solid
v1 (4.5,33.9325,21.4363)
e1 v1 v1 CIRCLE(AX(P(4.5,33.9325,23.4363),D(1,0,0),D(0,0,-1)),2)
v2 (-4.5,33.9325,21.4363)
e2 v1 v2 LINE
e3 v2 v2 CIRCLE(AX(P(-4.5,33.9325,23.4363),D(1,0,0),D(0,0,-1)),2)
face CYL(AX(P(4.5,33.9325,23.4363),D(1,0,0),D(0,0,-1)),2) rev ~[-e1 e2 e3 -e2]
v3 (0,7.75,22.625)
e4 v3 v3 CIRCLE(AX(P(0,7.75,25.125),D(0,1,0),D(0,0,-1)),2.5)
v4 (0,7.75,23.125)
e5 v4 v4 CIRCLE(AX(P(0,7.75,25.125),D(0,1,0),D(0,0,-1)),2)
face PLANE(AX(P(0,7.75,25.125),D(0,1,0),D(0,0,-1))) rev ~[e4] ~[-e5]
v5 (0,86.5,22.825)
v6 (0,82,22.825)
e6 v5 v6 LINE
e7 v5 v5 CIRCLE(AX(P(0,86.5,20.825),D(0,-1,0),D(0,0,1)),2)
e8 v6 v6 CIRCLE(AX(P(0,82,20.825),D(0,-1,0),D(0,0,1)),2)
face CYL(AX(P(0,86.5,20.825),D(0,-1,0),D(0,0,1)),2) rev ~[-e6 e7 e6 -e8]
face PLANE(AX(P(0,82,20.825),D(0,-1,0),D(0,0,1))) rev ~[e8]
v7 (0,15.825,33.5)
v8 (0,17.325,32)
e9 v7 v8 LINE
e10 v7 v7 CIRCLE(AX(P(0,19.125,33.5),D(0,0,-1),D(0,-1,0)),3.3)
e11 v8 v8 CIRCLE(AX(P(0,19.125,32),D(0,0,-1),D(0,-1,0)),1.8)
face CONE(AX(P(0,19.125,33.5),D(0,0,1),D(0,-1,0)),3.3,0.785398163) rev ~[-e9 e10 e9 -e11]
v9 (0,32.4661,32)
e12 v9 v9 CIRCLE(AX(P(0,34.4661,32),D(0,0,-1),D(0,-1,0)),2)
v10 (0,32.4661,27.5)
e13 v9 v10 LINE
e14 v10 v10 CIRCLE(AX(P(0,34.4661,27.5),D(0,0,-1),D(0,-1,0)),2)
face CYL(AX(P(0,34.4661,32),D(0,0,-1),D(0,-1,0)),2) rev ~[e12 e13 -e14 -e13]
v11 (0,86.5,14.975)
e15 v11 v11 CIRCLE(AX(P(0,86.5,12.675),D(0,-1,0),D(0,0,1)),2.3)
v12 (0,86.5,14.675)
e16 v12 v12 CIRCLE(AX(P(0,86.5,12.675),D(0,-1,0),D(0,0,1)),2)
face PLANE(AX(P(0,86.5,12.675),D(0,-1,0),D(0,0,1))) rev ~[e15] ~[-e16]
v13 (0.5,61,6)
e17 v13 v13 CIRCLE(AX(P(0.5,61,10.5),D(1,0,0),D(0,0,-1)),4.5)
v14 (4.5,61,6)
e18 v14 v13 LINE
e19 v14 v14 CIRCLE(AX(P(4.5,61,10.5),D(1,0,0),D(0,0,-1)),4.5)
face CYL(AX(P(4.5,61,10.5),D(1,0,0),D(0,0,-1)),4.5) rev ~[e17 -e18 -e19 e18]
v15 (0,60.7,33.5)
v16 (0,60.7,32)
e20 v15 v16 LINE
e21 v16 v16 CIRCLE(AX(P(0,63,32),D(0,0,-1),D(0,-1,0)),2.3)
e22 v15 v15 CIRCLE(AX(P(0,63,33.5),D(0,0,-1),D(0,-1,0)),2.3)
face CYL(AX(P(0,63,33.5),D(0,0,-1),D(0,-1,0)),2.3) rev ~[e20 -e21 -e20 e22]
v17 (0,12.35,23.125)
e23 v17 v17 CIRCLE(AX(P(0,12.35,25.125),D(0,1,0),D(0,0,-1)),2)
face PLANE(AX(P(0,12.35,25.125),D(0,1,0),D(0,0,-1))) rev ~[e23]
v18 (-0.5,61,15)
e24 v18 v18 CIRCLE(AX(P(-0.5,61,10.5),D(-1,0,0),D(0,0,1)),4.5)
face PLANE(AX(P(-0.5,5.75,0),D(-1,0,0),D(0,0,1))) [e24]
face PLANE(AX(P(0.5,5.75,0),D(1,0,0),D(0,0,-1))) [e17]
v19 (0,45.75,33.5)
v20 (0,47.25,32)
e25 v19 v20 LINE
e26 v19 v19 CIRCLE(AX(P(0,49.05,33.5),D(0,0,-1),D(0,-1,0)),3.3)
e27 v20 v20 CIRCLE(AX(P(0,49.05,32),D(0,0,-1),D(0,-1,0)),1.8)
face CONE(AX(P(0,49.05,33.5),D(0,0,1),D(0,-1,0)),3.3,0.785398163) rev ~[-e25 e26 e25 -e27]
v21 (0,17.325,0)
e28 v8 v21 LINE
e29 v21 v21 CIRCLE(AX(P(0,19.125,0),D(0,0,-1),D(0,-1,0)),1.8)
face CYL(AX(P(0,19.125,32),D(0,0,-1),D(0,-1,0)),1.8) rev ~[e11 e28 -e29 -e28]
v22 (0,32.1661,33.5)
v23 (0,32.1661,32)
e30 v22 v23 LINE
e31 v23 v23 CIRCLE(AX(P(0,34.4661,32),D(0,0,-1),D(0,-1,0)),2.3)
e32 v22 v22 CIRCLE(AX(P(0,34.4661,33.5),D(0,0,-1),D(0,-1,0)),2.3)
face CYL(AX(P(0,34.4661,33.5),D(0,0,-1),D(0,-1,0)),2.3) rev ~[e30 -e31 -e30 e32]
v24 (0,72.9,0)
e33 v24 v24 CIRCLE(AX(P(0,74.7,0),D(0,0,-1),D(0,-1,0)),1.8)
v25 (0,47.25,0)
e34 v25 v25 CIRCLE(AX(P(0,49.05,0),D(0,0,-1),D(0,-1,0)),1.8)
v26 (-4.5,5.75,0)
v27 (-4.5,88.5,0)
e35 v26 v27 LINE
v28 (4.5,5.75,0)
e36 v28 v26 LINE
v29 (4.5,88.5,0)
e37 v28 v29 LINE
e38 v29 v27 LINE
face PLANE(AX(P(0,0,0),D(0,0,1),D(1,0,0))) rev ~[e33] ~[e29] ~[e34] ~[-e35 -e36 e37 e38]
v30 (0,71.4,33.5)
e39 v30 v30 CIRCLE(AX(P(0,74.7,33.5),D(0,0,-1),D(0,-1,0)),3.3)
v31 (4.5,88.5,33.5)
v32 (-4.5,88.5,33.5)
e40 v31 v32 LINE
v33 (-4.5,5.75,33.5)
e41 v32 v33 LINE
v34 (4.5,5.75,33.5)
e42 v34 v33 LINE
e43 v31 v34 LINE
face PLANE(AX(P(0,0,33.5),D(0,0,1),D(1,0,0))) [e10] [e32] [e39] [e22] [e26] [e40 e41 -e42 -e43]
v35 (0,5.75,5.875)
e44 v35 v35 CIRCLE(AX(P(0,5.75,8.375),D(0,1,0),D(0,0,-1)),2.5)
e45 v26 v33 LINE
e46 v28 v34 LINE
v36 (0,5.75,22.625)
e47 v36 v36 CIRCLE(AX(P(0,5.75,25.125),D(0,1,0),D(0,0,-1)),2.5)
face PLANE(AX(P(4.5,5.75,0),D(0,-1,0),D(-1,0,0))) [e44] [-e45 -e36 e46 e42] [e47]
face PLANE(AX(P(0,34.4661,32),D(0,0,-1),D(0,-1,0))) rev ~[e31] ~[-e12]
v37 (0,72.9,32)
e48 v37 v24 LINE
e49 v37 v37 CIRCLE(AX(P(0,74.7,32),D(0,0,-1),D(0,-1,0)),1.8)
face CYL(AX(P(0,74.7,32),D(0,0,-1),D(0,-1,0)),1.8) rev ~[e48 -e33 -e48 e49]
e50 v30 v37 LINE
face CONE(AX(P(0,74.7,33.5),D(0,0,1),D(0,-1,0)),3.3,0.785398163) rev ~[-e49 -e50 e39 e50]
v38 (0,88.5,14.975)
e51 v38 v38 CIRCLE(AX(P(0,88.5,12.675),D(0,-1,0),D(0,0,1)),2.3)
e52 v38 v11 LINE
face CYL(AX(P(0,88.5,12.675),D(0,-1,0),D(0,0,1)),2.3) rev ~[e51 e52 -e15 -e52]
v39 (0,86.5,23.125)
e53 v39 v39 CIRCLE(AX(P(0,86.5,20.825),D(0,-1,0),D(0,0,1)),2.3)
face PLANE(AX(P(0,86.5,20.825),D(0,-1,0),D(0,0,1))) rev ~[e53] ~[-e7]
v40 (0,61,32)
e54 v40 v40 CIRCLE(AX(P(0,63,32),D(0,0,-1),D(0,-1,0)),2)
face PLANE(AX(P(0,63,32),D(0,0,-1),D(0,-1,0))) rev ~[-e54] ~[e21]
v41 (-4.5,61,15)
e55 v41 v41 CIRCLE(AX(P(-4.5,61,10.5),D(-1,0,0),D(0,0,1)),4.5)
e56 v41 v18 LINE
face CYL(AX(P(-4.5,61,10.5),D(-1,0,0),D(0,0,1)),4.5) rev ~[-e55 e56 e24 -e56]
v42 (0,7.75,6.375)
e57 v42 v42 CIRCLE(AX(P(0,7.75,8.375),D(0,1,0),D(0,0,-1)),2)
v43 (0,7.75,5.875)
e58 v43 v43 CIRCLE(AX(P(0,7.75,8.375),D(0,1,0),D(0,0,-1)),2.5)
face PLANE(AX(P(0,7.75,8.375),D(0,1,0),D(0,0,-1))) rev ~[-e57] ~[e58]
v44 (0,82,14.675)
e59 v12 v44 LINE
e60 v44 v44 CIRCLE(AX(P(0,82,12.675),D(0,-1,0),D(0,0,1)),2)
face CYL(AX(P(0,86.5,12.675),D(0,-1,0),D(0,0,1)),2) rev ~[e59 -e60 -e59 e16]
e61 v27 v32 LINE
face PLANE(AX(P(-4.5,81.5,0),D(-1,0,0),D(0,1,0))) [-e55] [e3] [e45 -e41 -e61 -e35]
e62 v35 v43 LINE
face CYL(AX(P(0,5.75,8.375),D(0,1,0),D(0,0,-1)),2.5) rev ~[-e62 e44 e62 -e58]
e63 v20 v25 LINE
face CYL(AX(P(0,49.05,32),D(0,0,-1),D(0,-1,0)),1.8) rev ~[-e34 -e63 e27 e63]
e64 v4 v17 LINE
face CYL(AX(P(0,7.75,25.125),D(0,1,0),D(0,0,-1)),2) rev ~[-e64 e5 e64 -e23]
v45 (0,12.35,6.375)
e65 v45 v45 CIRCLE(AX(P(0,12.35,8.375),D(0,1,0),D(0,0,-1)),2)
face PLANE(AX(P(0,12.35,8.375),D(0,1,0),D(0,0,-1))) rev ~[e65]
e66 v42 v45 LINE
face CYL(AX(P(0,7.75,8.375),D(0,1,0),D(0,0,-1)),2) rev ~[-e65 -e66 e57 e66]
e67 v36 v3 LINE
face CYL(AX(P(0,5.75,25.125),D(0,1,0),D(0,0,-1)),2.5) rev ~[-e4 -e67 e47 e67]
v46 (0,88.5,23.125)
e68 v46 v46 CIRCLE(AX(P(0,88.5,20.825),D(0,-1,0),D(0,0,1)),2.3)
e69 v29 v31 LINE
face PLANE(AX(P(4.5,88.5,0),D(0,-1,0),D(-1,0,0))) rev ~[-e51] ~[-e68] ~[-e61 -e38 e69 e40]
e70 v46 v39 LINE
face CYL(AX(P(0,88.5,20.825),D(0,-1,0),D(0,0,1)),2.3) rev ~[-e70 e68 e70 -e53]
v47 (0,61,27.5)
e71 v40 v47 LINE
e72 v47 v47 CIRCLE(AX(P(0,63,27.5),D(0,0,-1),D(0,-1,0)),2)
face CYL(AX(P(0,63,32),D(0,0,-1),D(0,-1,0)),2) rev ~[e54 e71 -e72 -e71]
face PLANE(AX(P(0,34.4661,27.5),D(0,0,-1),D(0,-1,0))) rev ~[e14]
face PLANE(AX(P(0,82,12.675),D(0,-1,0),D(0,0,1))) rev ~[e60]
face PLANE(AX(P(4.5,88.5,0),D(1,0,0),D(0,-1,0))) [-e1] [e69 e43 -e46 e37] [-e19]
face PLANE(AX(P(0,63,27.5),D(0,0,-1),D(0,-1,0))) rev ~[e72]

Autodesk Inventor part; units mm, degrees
ref_plane "YZ Plane" through (0, 0, 0) normal (1, 0, 0) x (0, 1, 0)
ref_plane "XZ Plane" through (0, 0, 0) normal (0, 1, 0) x (-1, 0, 0)
ref_plane "Work Plane1" through (0, 0, 0) normal (0, 0, 1) x (1, 0, 0)
ref_plane "Work Plane2" through (-89, -40.3889, 33.5) normal (0, 0, 1) x (1, 0, 0)
sketch "Sketch1" plane through (0, 0, 0) normal (0, 0, 1) x (1, 0, 0)
  line L0 (23.5, 88.5) -> (-23.5, 88.5) projected
  line L1 (-23.5, 88.5) -> (-23.5, 36.5) projected
  line L2 (-26.5, 33.5) -> (-89, 33.5) projected
  line L3 (-89, 33.5) -> (-89, -72.5) projected
  line L4 (-89, -72.5) -> (-77, -72.5) projected
  line L5 (-74, -75.5) -> (-74, -93.5) projected
  line L6 (-74, -93.5) -> (74, -93.5) projected
  line L7 (74, -93.5) -> (74, -75.5) projected
  line L8 (77, -72.5) -> (89, -72.5) projected
  line L9 (89, -72.5) -> (89, 33.5) projected
  line L10 (89, 33.5) -> (26.5, 33.5) projected
  line L11 (23.5, 36.5) -> (23.5, 88.5) projected
  line L12 (-4.5, 81.5) -> (-4.5, 36.5) projected
  line L13 (-7.5, 33.5) -> (-13.5, 33.5) projected
  line L14 (-16.5, 36.5) -> (-16.5, 81.5) projected
  line L15 (7.5, 84.5) -> (13.5, 84.5) projected
  line L16 (16.5, 81.5) -> (16.5, 36.5) projected
  line L17 (13.5, 33.5) -> (7.5, 33.5) projected
  line L18 (4.5, 36.5) -> (4.5, 81.5) projected
  line L19 (-13.5, 84.5) -> (-7.5, 84.5) projected
  line L20 (-4.5, 88.5) -> (4.5, 88.5)
  line L21 (4.5, 88.5) -> (4.5, 5.75)
  line L22 (4.5, 5.75) -> (-4.5, 5.75)
  line L23 (-4.5, 5.75) -> (-4.5, 88.5)
  line L24 (-32.2, 4.75) -> (-59.9, 4.75)
  arc A0 (13.5, 33.5) -> (16.5, 36.5) centre (13.5, 36.5) ccw projected
  arc A1 (4.5, 36.5) -> (7.5, 33.5) centre (7.5, 36.5) ccw projected
  arc A2 (7.5, 84.5) -> (4.5, 81.5) centre (7.5, 81.5) ccw projected
  arc A3 (16.5, 81.5) -> (13.5, 84.5) centre (13.5, 81.5) ccw projected
  arc A4 (-4.5, 81.5) -> (-7.5, 84.5) centre (-7.5, 81.5) ccw projected
  arc A5 (-7.5, 33.5) -> (-4.5, 36.5) centre (-7.5, 36.5) ccw projected
  arc A6 (-16.5, 36.5) -> (-13.5, 33.5) centre (-13.5, 36.5) ccw projected
  arc A7 (-13.5, 84.5) -> (-16.5, 81.5) centre (-13.5, 81.5) ccw projected
  arc A8 (-26.5, 33.5) -> (-23.5, 36.5) centre (-26.5, 36.5) ccw projected
  arc A9 (-74, -75.5) -> (-77, -72.5) centre (-77, -75.5) ccw projected
  arc A10 (77, -72.5) -> (74, -75.5) centre (77, -75.5) ccw projected
  arc A11 (23.5, 36.5) -> (26.5, 33.5) centre (26.5, 36.5) ccw projected
  circle A12 centre (39.125, 25.9125) radius 1.0065 projected
  circle A13 centre (72.95, 12.275) radius 1.0065 projected
  circle A14 centre (-39.125, 12.3375) radius 1.0065 projected
  circle A15 centre (-72.95, 25.975) radius 1.0065 projected
  circle A16 centre (-72.95, 12.275) radius 1.0065 projected
  circle A17 centre (-39.125, 25.9125) radius 1.0065 projected
  circle A18 centre (72.95, 25.975) radius 1.0065 projected
  circle A19 centre (39.125, 12.3375) radius 1.0065 projected
  circle A20 centre (-42.4984, -44.6666) radius 1.2295 projected
  circle A21 centre (-79, -42.3889) radius 1.2295 projected
  circle A22 centre (-19.5, 28.875) radius 1.2295 projected
  circle A23 centre (19.5, 9.55) radius 1.2295 projected
  circle A24 centre (19.5, 47.3) radius 1.2295 projected
  circle A25 centre (-19.5, 47.3) radius 1.2295 projected
  circle A26 centre (0, 74.7) radius 1.2295 projected
  circle A27 centre (-19.4231, 74.8077) radius 1.2295 projected
  circle A28 centre (19.5, 74.7) radius 1.2295 projected
  circle A29 centre (0, 49.05) radius 1.2295 projected
  circle A30 centre (19.5, 28.875) radius 1.2295 projected
  circle A31 centre (0, 19.125) radius 1.2295 projected
  circle A32 centre (-19.5, 9.55) radius 1.2295 projected
  circle A33 centre (42.5, -44.6649) radius 1.2295 projected
  circle A34 centre (79, -42.3889) radius 1.2295 projected
  circle A35 centre (21.5, -85.5) radius 1.8 projected
  circle A36 centre (-64.5, -85.5) radius 1.8 projected
  circle A37 centre (-21.5, -85.5) radius 1.8 projected
  circle A38 centre (64.5, -85.5) radius 1.8 projected
  line L25 (-57, -78.5) -> (-82, -60.2553) projected
  line L26 (-82, -60.2553) -> (-82, -45.3889) projected
  line L27 (-76, -45.3889) -> (-45.4984, -47.6666) projected
  line L28 (-21.1, -27.9) -> (-21.1, -21.9) projected
  line L29 (-45.4984, -41.6666) -> (-76, -39.3889) projected
  line L30 (-82, -39.3889) -> (-82, 4.75) projected
  line L31 (30.3333, 4.75) -> (82, 4.75) projected
  line L32 (82, 4.75) -> (82, -39.3889) projected
  line L33 (76, -39.3889) -> (45.5, -41.6649) projected
  line L34 (21.1, -21.9) -> (21.1, -27.9) projected
  line L35 (45.5, -47.6649) -> (76, -45.3889) projected
  line L36 (82, -45.3889) -> (82, -60.2553) projected
  line L37 (82, -60.2553) -> (57, -78.5) projected
  line L38 (57, -78.5) -> (57, -87.5) projected
  arc A39 (55, -89.5) -> (57, -87.5) centre (55, -87.5) ccw projected
  line L39 (55, -89.5) -> (31, -89.5) projected
  arc A40 (29, -87.5) -> (31, -89.5) centre (31, -87.5) ccw projected
  line L40 (29, -87.5) -> (29, -78.5) projected
  line L41 (14, -78.5) -> (14, -87.5) projected
  arc A41 (12, -89.5) -> (14, -87.5) centre (12, -87.5) ccw projected
  line L42 (12, -89.5) -> (-12, -89.5) projected
  arc A42 (-14, -87.5) -> (-12, -89.5) centre (-12, -87.5) ccw projected
  line L43 (-14, -87.5) -> (-14, -78.5) projected
  line L44 (-29, -78.5) -> (-29, -87.5) projected
  arc A43 (-31, -89.5) -> (-29, -87.5) centre (-31, -87.5) ccw projected
  line L45 (-31, -89.5) -> (-55, -89.5) projected
  arc A44 (-57, -87.5) -> (-55, -89.5) centre (-55, -87.5) ccw projected
  line L46 (-57, -87.5) -> (-57, -78.5) projected
  line L47 (-69.95, 28.9125) -> (-42.125, 28.9125) projected
  line L48 (-42.125, 28.9125) -> (-42.125, 9.275) projected
  line L49 (-42.125, 9.275) -> (-69.95, 9.275) projected
  line L50 (-69.95, 9.275) -> (-69.95, 28.9125) projected
  line L51 (-16.5, 9.75) -> (-16.5, 28.5) projected
  line L52 (-16.5, 28.5) -> (-4.5, 28.5) projected
  line L53 (-4.5, 28.5) -> (-4.5, 9.75) projected
  line L54 (-4.5, 9.75) -> (-16.5, 9.75) projected
  line L55 (69.95, 9.3375) -> (42.125, 9.3375) projected
  line L56 (42.125, 9.3375) -> (42.125, 28.975) projected
  line L57 (42.125, 28.975) -> (69.95, 28.975) projected
  line L58 (69.95, 28.975) -> (69.95, 9.3375) projected
  line L59 (4.5, 9.75) -> (4.5, 28.5) projected
  line L60 (4.5, 28.5) -> (16.5, 28.5) projected
  line L61 (16.5, 28.5) -> (16.5, 9.75) projected
  line L62 (16.5, 9.75) -> (4.5, 9.75) projected
  line L63 (45.5, -41.6649) -> (27.1, -21.9) projected
  line L64 (27.1, -21.9) -> (30.3333, 4.75) projected
  line L65 (-45.4984, -47.6666) -> (-29, -78.5) projected
  line L66 (-82, 4.75) -> (-30.3333, 4.75) projected
  line L67 (-30.3333, 4.75) -> (-27.1, -21.9) projected
  line L68 (-27.1, -21.9) -> (-45.4984, -41.6666) projected
  line L69 (29, -78.5) -> (45.5, -47.6649) projected
  line L70 (-14, -78.5) -> (-39, -45.3279) projected
  line L71 (-39, -44.2124) -> (-21.1, -27.9) projected
  line L72 (-21.1, -21.9) -> (-24.3333, 4.75) projected
  line L73 (-24.3333, 4.75) -> (24.3333, 4.75) projected
  line L74 (24.3333, 4.75) -> (21.1, -21.9) projected
  line L75 (21.1, -27.9) -> (39.5, -44.6649) projected
  line L76 (39.5, -44.6649) -> (14, -78.5) projected
  circle A45 centre (-78, -67.1725) radius 1.2295 projected
  circle A46 centre (78, -67.1725) radius 1.2295 projected
  line L77 (-22.5, 28.9125) -> (-22.5, 9.55) projected
  line L78 (-22.5, 9.55) -> (-36.125, 9.55) projected
  line L79 (-36.125, 9.55) -> (-36.125, 28.9125) projected
  line L80 (-36.125, 28.9125) -> (-22.5, 28.9125) projected
  line L81 (76, -45.3889) -> (82, -45.3889) projected
  line L82 (82, -39.3889) -> (76, -39.3889) projected
  line L83 (36.125, 9.275) -> (22.5, 9.275) projected
  line L84 (22.5, 9.275) -> (22.5, 28.9125) projected
  line L85 (22.5, 28.9125) -> (36.125, 28.9125) projected
  line L86 (36.125, 28.9125) -> (36.125, 9.275) projected
  line L87 (-86, 28.975) -> (-75.95, 28.975) projected
  line L88 (-75.95, 28.975) -> (-75.95, 9.275) projected
  line L89 (-75.95, 9.275) -> (-86, 9.275) projected
  line L90 (-86, 9.275) -> (-86, 28.975) projected
  line L91 (-82, -45.3889) -> (-76, -45.3889) projected
  line L92 (-76, -39.3889) -> (-82, -39.3889) projected
  line L93 (75.95, 28.975) -> (86, 28.975) projected
  line L94 (86, 28.975) -> (86, 9.275) projected
  line L95 (86, 9.275) -> (75.95, 9.275) projected
  line L96 (75.95, 9.275) -> (75.95, 28.975) projected
  line L97 (-39, -45.3279) -> (-39, -44.2124) projected
  circle A47 centre (-24.1, -73.1) radius 1.2295 projected
  circle A48 centre (24.1, -24.9) radius 1.2295 projected
  circle A49 centre (-24.1, -24.9) radius 1.2295 projected
  circle A50 centre (24.1, -73.1) radius 1.2295 projected
  point P0 (0, 0)
  point P1 (-4.5, 81.5)
  point P2 (-4.5, 36.5)
  point P3 (7.5, 81.5)
  point P4 (13.5, 81.5)
  point P5 (-7.5, 81.5)
  point P6 (-13.5, 81.5)
  point P7 (-77, -75.5)
  point P8 (39, -44.2094)
  point P9 (-79, -67.8878)
  point P10 (-79, -66.4572)
  point P11 (7.5, 81.5)
  point P12 (13.5, 81.5)
  point P13 (-7.5, 81.5)
  point P14 (-13.5, 81.5)
  dimension "d41" = 1
extrude "Extrusion1" add sketch "Sketch1" along normal up to surface (33.5 mm away) contours L21 L18 L22 L23 L12 L0 | A26 | A29 | A31
sketch "Sketch2" plane through (4.5, 5.75, 0) normal (1, 0, 0) x (0, 0, -1)
  circle A0 centre (-23.4363, 28.1825) radius 2 projected
  point P0 (0, -5.75)
extrude "Extrusion2" cut sketch "Sketch2" against normal blind 10
sketch "Sketch3" plane through (4.5, 5.75, 0) normal (1, 0, 0) x (0, 0, -1)
  circle A0 centre (-10.5, 55.25) radius 4.5 projected
  point P0 (0, -5.75)
extrude "Extrusion3" cut sketch "Sketch3" against normal blind 4
sketch "Sketch4" plane through (-4.5, 5.75, 0) normal (-1, 0, 0) x (0, 0, 1)
  circle A0 centre (10.5, 55.25) radius 4.5 projected
  point P0 (0, -5.75)
extrude "Extrusion4" cut sketch "Sketch4" against normal blind 4
sketch "Sketch5" plane through (-4.5, 5.75, 33.5) normal (0, 0, 1) x (1, 0, 0)
  line L0 (5, 59.75) -> (5, 50.75) projected
  line L1 (4, 50.75) -> (4, 59.75) projected
  line L2 (9, 26.1825) -> (0, 26.1825) projected
  line L3 (9, 30.1825) -> (0, 30.1825) projected
  line L4 (17, 78.15) -> (-8, 78.15)
  line L5 (-8, 35.85) -> (17, 35.85)
  line L6 (9, 82.75) -> (9, 0) projected
  line L7 (0, 50.75) -> (0, 59.75) projected
  line L8 (9, 35.85) -> (0, 35.85)
  line L9 (0, 35.85) -> (0, 50.75)
  line L10 (0, 50.75) -> (9, 50.75)
  line L11 (9, 50.75) -> (9, 35.85)
  line L12 (0, 0) -> (0, 82.75) projected
  line L13 (9, 78.15) -> (0, 78.15)
  line L14 (0, 78.15) -> (0, 59.75)
  line L15 (0, 59.75) -> (9, 59.75)
  line L16 (9, 59.75) -> (9, 78.15)
  line L17 (-18, 6.625) -> (-18, 20.125) projected
  line L18 (-18, 13.375) -> (27, 13.375)
  line L19 (9, 35.85) -> (0, 50.75)
  line L20 (9, 59.75) -> (9, 50.75) projected
  line L21 (0, 35.85) -> (9, 50.75)
  line L22 (9, 59.75) -> (0, 78.15)
  line L23 (0, 59.75) -> (9, 78.15)
  point P0 (4.5, -5.75)
  point P1 (4.5, 13.375)
  point P2 (4.5, 43.3)
  point P3 (4.5, 68.95)
  dimension "d9" = 4.5
  dimension "d10" = 4.5
hole "Hole1" at (0, 19.125, 33.5) at (0, 49.05, 33.5) at (0, 74.7, 33.5) direction (0, 0, -1) diameter 3.6 end through all countersink diameter 6.6 countersink angle 90 clearance for "Countersunk Flat Head Screw ISO 2009/7046" size "M3" standard "ISO"
sketch "Sketch6" plane through (-4.5, 5.75, 0) normal (0, -1, 0) x (1, 0, 0)
  line L0 (9, 33.5) -> (0, 33.5) projected
  line L1 (0, 0) -> (0, 33.5) projected
  line L2 (0, 0) -> (9, 0) projected
  line L3 (9, 0) -> (9, 33.5) projected
  line L4 (0, 16.75) -> (9, 16.75)
  line L5 (9, 16.75) -> (0, 33.5)
  line L6 (9, 33.5) -> (0, 16.75)
  line L7 (0, 16.75) -> (9, 0)
  line L8 (9, 16.75) -> (0, 0)
  point P0 (4.5, 0)
  point P1 (4.5, 8.375)
  point P2 (4.5, 25.125)
hole "Hole2" at (0, 5.75, 8.375) at (0, 5.75, 25.125) direction (0, 1, 0) diameter 4 depth 6.6 counterbore diameter 5 counterbore depth 2
sketch "Sketch7" plane through (-4.5, 88.5, 0) normal (0, 1, 0) x (1, 0, 0)
  line L0 (0, -33.5) -> (9, -33.5) projected
  line L1 (0, -33.5) -> (9, -33.5) projected
  line L2 (9, 0) -> (9, -33.5) projected
  line L3 (9, 0) -> (0, 0) projected
  line L4 (0, 0) -> (0, -33.5) projected
  line L5 (-8, -1.4) -> (-8, -6.6) projected
  line L6 (-8, -32.1) -> (-8, -26.9) projected
  line L7 (17, -32.1) -> (17, -26.9) projected
  line L8 (17, -1.4) -> (17, -6.6) projected
  line L9 (17, -32.1) -> (-8, -32.1)
  line L10 (-8, -32.1) -> (-8, -26.9)
  line L11 (-8, -26.9) -> (17, -26.9)
  line L12 (17, -26.9) -> (17, -32.1)
  line L13 (-8, -6.6) -> (17, -6.6)
  line L14 (17, -6.6) -> (17, -1.4)
  line L15 (17, -1.4) -> (-8, -1.4)
  line L16 (-8, -1.4) -> (-8, -6.6)
  line L17 (17, -6.6) -> (-8, -6.6)
  line L18 (-8, -6.6) -> (-8, -8.6)
  line L19 (-8, -8.6) -> (17, -8.6)
  line L20 (17, -8.6) -> (17, -6.6)
  line L21 (-8, -26.9) -> (17, -26.9)
  line L22 (17, -26.9) -> (17, -24.9)
  line L23 (17, -24.9) -> (-8, -24.9)
  line L24 (-8, -24.9) -> (-8, -26.9)
  line L25 (9, 0) -> (9, -33.5) projected
  line L26 (9, -16.75) -> (0, -16.75)
  line L27 (0, 0) -> (0, -33.5) projected
  line L28 (9, -24.9) -> (0, -16.75)
  line L29 (9, -8.6) -> (0, -16.75)
  line L30 (0, -8.6) -> (9, -16.75)
  line L31 (9, -16.75) -> (0, -24.9)
  point P0 (4.5, 0)
  point P1 (4.5, -20.825)
  point P2 (4.5, -12.675)
  dimension "d25" = 2
  dimension "d26" = 2
hole "Hole3" at (0, 88.5, 20.825) at (0, 88.5, 12.675) direction (0, -1, 0) diameter 4 depth 6.5 counterbore diameter 4.6 counterbore depth 2
sketch "Sketch8" plane through (-4.5, 5.75, 33.5) normal (0, 0, 1) x (1, 0, 0)
  line L0 (26, 27.2497) -> (-17, 27.2497)
  line L1 (26, 31.2497) -> (-17, 31.2497)
  line L2 (4, 52.75) -> (-1, 52.75)
  line L3 (4, 61.75) -> (-1, 61.75)
  line L4 (10, 61.75) -> (5, 61.75)
  line L5 (9, 50.75) -> (5, 50.75) projected
  line L6 (0, 0) -> (0, 82.75) projected
  line L7 (9, 52.75) -> (0, 52.75)
  line L8 (0, 52.75) -> (0, 61.75)
  line L9 (0, 61.75) -> (9, 61.75)
  line L10 (9, 61.75) -> (9, 50.75)
  line L11 (9, 26.1825) -> (0, 26.1825) projected
  line L12 (0, 31.2497) -> (9, 31.2497)
  line L13 (9, 31.2497) -> (9, 26.1825)
  line L14 (9, 26.1825) -> (0, 26.1825)
  line L15 (0, 26.1825) -> (0, 31.2497)
  line L16 (9, 26.1825) -> (0, 31.2497)
  line L17 (0, 26.1825) -> (9, 31.2497)
  line L18 (10, 51.75) -> (0, 61.75)
  line L19 (0, 52.75) -> (9, 61.75)
  point P0 (4.5, -5.75)
  point P1 (4.5, 28.7161)
  point P2 (4.5, 57.25)
hole "Hole4" at (0, 34.4661, 33.5) at (0, 63, 33.5) direction (0, 0, -1) diameter 4 depth 6 counterbore diameter 4.6 counterbore depth 1.5
equation "\"d9\" = d10"
properties part number "middle_gear_holder" material "Nylon 6/6"
